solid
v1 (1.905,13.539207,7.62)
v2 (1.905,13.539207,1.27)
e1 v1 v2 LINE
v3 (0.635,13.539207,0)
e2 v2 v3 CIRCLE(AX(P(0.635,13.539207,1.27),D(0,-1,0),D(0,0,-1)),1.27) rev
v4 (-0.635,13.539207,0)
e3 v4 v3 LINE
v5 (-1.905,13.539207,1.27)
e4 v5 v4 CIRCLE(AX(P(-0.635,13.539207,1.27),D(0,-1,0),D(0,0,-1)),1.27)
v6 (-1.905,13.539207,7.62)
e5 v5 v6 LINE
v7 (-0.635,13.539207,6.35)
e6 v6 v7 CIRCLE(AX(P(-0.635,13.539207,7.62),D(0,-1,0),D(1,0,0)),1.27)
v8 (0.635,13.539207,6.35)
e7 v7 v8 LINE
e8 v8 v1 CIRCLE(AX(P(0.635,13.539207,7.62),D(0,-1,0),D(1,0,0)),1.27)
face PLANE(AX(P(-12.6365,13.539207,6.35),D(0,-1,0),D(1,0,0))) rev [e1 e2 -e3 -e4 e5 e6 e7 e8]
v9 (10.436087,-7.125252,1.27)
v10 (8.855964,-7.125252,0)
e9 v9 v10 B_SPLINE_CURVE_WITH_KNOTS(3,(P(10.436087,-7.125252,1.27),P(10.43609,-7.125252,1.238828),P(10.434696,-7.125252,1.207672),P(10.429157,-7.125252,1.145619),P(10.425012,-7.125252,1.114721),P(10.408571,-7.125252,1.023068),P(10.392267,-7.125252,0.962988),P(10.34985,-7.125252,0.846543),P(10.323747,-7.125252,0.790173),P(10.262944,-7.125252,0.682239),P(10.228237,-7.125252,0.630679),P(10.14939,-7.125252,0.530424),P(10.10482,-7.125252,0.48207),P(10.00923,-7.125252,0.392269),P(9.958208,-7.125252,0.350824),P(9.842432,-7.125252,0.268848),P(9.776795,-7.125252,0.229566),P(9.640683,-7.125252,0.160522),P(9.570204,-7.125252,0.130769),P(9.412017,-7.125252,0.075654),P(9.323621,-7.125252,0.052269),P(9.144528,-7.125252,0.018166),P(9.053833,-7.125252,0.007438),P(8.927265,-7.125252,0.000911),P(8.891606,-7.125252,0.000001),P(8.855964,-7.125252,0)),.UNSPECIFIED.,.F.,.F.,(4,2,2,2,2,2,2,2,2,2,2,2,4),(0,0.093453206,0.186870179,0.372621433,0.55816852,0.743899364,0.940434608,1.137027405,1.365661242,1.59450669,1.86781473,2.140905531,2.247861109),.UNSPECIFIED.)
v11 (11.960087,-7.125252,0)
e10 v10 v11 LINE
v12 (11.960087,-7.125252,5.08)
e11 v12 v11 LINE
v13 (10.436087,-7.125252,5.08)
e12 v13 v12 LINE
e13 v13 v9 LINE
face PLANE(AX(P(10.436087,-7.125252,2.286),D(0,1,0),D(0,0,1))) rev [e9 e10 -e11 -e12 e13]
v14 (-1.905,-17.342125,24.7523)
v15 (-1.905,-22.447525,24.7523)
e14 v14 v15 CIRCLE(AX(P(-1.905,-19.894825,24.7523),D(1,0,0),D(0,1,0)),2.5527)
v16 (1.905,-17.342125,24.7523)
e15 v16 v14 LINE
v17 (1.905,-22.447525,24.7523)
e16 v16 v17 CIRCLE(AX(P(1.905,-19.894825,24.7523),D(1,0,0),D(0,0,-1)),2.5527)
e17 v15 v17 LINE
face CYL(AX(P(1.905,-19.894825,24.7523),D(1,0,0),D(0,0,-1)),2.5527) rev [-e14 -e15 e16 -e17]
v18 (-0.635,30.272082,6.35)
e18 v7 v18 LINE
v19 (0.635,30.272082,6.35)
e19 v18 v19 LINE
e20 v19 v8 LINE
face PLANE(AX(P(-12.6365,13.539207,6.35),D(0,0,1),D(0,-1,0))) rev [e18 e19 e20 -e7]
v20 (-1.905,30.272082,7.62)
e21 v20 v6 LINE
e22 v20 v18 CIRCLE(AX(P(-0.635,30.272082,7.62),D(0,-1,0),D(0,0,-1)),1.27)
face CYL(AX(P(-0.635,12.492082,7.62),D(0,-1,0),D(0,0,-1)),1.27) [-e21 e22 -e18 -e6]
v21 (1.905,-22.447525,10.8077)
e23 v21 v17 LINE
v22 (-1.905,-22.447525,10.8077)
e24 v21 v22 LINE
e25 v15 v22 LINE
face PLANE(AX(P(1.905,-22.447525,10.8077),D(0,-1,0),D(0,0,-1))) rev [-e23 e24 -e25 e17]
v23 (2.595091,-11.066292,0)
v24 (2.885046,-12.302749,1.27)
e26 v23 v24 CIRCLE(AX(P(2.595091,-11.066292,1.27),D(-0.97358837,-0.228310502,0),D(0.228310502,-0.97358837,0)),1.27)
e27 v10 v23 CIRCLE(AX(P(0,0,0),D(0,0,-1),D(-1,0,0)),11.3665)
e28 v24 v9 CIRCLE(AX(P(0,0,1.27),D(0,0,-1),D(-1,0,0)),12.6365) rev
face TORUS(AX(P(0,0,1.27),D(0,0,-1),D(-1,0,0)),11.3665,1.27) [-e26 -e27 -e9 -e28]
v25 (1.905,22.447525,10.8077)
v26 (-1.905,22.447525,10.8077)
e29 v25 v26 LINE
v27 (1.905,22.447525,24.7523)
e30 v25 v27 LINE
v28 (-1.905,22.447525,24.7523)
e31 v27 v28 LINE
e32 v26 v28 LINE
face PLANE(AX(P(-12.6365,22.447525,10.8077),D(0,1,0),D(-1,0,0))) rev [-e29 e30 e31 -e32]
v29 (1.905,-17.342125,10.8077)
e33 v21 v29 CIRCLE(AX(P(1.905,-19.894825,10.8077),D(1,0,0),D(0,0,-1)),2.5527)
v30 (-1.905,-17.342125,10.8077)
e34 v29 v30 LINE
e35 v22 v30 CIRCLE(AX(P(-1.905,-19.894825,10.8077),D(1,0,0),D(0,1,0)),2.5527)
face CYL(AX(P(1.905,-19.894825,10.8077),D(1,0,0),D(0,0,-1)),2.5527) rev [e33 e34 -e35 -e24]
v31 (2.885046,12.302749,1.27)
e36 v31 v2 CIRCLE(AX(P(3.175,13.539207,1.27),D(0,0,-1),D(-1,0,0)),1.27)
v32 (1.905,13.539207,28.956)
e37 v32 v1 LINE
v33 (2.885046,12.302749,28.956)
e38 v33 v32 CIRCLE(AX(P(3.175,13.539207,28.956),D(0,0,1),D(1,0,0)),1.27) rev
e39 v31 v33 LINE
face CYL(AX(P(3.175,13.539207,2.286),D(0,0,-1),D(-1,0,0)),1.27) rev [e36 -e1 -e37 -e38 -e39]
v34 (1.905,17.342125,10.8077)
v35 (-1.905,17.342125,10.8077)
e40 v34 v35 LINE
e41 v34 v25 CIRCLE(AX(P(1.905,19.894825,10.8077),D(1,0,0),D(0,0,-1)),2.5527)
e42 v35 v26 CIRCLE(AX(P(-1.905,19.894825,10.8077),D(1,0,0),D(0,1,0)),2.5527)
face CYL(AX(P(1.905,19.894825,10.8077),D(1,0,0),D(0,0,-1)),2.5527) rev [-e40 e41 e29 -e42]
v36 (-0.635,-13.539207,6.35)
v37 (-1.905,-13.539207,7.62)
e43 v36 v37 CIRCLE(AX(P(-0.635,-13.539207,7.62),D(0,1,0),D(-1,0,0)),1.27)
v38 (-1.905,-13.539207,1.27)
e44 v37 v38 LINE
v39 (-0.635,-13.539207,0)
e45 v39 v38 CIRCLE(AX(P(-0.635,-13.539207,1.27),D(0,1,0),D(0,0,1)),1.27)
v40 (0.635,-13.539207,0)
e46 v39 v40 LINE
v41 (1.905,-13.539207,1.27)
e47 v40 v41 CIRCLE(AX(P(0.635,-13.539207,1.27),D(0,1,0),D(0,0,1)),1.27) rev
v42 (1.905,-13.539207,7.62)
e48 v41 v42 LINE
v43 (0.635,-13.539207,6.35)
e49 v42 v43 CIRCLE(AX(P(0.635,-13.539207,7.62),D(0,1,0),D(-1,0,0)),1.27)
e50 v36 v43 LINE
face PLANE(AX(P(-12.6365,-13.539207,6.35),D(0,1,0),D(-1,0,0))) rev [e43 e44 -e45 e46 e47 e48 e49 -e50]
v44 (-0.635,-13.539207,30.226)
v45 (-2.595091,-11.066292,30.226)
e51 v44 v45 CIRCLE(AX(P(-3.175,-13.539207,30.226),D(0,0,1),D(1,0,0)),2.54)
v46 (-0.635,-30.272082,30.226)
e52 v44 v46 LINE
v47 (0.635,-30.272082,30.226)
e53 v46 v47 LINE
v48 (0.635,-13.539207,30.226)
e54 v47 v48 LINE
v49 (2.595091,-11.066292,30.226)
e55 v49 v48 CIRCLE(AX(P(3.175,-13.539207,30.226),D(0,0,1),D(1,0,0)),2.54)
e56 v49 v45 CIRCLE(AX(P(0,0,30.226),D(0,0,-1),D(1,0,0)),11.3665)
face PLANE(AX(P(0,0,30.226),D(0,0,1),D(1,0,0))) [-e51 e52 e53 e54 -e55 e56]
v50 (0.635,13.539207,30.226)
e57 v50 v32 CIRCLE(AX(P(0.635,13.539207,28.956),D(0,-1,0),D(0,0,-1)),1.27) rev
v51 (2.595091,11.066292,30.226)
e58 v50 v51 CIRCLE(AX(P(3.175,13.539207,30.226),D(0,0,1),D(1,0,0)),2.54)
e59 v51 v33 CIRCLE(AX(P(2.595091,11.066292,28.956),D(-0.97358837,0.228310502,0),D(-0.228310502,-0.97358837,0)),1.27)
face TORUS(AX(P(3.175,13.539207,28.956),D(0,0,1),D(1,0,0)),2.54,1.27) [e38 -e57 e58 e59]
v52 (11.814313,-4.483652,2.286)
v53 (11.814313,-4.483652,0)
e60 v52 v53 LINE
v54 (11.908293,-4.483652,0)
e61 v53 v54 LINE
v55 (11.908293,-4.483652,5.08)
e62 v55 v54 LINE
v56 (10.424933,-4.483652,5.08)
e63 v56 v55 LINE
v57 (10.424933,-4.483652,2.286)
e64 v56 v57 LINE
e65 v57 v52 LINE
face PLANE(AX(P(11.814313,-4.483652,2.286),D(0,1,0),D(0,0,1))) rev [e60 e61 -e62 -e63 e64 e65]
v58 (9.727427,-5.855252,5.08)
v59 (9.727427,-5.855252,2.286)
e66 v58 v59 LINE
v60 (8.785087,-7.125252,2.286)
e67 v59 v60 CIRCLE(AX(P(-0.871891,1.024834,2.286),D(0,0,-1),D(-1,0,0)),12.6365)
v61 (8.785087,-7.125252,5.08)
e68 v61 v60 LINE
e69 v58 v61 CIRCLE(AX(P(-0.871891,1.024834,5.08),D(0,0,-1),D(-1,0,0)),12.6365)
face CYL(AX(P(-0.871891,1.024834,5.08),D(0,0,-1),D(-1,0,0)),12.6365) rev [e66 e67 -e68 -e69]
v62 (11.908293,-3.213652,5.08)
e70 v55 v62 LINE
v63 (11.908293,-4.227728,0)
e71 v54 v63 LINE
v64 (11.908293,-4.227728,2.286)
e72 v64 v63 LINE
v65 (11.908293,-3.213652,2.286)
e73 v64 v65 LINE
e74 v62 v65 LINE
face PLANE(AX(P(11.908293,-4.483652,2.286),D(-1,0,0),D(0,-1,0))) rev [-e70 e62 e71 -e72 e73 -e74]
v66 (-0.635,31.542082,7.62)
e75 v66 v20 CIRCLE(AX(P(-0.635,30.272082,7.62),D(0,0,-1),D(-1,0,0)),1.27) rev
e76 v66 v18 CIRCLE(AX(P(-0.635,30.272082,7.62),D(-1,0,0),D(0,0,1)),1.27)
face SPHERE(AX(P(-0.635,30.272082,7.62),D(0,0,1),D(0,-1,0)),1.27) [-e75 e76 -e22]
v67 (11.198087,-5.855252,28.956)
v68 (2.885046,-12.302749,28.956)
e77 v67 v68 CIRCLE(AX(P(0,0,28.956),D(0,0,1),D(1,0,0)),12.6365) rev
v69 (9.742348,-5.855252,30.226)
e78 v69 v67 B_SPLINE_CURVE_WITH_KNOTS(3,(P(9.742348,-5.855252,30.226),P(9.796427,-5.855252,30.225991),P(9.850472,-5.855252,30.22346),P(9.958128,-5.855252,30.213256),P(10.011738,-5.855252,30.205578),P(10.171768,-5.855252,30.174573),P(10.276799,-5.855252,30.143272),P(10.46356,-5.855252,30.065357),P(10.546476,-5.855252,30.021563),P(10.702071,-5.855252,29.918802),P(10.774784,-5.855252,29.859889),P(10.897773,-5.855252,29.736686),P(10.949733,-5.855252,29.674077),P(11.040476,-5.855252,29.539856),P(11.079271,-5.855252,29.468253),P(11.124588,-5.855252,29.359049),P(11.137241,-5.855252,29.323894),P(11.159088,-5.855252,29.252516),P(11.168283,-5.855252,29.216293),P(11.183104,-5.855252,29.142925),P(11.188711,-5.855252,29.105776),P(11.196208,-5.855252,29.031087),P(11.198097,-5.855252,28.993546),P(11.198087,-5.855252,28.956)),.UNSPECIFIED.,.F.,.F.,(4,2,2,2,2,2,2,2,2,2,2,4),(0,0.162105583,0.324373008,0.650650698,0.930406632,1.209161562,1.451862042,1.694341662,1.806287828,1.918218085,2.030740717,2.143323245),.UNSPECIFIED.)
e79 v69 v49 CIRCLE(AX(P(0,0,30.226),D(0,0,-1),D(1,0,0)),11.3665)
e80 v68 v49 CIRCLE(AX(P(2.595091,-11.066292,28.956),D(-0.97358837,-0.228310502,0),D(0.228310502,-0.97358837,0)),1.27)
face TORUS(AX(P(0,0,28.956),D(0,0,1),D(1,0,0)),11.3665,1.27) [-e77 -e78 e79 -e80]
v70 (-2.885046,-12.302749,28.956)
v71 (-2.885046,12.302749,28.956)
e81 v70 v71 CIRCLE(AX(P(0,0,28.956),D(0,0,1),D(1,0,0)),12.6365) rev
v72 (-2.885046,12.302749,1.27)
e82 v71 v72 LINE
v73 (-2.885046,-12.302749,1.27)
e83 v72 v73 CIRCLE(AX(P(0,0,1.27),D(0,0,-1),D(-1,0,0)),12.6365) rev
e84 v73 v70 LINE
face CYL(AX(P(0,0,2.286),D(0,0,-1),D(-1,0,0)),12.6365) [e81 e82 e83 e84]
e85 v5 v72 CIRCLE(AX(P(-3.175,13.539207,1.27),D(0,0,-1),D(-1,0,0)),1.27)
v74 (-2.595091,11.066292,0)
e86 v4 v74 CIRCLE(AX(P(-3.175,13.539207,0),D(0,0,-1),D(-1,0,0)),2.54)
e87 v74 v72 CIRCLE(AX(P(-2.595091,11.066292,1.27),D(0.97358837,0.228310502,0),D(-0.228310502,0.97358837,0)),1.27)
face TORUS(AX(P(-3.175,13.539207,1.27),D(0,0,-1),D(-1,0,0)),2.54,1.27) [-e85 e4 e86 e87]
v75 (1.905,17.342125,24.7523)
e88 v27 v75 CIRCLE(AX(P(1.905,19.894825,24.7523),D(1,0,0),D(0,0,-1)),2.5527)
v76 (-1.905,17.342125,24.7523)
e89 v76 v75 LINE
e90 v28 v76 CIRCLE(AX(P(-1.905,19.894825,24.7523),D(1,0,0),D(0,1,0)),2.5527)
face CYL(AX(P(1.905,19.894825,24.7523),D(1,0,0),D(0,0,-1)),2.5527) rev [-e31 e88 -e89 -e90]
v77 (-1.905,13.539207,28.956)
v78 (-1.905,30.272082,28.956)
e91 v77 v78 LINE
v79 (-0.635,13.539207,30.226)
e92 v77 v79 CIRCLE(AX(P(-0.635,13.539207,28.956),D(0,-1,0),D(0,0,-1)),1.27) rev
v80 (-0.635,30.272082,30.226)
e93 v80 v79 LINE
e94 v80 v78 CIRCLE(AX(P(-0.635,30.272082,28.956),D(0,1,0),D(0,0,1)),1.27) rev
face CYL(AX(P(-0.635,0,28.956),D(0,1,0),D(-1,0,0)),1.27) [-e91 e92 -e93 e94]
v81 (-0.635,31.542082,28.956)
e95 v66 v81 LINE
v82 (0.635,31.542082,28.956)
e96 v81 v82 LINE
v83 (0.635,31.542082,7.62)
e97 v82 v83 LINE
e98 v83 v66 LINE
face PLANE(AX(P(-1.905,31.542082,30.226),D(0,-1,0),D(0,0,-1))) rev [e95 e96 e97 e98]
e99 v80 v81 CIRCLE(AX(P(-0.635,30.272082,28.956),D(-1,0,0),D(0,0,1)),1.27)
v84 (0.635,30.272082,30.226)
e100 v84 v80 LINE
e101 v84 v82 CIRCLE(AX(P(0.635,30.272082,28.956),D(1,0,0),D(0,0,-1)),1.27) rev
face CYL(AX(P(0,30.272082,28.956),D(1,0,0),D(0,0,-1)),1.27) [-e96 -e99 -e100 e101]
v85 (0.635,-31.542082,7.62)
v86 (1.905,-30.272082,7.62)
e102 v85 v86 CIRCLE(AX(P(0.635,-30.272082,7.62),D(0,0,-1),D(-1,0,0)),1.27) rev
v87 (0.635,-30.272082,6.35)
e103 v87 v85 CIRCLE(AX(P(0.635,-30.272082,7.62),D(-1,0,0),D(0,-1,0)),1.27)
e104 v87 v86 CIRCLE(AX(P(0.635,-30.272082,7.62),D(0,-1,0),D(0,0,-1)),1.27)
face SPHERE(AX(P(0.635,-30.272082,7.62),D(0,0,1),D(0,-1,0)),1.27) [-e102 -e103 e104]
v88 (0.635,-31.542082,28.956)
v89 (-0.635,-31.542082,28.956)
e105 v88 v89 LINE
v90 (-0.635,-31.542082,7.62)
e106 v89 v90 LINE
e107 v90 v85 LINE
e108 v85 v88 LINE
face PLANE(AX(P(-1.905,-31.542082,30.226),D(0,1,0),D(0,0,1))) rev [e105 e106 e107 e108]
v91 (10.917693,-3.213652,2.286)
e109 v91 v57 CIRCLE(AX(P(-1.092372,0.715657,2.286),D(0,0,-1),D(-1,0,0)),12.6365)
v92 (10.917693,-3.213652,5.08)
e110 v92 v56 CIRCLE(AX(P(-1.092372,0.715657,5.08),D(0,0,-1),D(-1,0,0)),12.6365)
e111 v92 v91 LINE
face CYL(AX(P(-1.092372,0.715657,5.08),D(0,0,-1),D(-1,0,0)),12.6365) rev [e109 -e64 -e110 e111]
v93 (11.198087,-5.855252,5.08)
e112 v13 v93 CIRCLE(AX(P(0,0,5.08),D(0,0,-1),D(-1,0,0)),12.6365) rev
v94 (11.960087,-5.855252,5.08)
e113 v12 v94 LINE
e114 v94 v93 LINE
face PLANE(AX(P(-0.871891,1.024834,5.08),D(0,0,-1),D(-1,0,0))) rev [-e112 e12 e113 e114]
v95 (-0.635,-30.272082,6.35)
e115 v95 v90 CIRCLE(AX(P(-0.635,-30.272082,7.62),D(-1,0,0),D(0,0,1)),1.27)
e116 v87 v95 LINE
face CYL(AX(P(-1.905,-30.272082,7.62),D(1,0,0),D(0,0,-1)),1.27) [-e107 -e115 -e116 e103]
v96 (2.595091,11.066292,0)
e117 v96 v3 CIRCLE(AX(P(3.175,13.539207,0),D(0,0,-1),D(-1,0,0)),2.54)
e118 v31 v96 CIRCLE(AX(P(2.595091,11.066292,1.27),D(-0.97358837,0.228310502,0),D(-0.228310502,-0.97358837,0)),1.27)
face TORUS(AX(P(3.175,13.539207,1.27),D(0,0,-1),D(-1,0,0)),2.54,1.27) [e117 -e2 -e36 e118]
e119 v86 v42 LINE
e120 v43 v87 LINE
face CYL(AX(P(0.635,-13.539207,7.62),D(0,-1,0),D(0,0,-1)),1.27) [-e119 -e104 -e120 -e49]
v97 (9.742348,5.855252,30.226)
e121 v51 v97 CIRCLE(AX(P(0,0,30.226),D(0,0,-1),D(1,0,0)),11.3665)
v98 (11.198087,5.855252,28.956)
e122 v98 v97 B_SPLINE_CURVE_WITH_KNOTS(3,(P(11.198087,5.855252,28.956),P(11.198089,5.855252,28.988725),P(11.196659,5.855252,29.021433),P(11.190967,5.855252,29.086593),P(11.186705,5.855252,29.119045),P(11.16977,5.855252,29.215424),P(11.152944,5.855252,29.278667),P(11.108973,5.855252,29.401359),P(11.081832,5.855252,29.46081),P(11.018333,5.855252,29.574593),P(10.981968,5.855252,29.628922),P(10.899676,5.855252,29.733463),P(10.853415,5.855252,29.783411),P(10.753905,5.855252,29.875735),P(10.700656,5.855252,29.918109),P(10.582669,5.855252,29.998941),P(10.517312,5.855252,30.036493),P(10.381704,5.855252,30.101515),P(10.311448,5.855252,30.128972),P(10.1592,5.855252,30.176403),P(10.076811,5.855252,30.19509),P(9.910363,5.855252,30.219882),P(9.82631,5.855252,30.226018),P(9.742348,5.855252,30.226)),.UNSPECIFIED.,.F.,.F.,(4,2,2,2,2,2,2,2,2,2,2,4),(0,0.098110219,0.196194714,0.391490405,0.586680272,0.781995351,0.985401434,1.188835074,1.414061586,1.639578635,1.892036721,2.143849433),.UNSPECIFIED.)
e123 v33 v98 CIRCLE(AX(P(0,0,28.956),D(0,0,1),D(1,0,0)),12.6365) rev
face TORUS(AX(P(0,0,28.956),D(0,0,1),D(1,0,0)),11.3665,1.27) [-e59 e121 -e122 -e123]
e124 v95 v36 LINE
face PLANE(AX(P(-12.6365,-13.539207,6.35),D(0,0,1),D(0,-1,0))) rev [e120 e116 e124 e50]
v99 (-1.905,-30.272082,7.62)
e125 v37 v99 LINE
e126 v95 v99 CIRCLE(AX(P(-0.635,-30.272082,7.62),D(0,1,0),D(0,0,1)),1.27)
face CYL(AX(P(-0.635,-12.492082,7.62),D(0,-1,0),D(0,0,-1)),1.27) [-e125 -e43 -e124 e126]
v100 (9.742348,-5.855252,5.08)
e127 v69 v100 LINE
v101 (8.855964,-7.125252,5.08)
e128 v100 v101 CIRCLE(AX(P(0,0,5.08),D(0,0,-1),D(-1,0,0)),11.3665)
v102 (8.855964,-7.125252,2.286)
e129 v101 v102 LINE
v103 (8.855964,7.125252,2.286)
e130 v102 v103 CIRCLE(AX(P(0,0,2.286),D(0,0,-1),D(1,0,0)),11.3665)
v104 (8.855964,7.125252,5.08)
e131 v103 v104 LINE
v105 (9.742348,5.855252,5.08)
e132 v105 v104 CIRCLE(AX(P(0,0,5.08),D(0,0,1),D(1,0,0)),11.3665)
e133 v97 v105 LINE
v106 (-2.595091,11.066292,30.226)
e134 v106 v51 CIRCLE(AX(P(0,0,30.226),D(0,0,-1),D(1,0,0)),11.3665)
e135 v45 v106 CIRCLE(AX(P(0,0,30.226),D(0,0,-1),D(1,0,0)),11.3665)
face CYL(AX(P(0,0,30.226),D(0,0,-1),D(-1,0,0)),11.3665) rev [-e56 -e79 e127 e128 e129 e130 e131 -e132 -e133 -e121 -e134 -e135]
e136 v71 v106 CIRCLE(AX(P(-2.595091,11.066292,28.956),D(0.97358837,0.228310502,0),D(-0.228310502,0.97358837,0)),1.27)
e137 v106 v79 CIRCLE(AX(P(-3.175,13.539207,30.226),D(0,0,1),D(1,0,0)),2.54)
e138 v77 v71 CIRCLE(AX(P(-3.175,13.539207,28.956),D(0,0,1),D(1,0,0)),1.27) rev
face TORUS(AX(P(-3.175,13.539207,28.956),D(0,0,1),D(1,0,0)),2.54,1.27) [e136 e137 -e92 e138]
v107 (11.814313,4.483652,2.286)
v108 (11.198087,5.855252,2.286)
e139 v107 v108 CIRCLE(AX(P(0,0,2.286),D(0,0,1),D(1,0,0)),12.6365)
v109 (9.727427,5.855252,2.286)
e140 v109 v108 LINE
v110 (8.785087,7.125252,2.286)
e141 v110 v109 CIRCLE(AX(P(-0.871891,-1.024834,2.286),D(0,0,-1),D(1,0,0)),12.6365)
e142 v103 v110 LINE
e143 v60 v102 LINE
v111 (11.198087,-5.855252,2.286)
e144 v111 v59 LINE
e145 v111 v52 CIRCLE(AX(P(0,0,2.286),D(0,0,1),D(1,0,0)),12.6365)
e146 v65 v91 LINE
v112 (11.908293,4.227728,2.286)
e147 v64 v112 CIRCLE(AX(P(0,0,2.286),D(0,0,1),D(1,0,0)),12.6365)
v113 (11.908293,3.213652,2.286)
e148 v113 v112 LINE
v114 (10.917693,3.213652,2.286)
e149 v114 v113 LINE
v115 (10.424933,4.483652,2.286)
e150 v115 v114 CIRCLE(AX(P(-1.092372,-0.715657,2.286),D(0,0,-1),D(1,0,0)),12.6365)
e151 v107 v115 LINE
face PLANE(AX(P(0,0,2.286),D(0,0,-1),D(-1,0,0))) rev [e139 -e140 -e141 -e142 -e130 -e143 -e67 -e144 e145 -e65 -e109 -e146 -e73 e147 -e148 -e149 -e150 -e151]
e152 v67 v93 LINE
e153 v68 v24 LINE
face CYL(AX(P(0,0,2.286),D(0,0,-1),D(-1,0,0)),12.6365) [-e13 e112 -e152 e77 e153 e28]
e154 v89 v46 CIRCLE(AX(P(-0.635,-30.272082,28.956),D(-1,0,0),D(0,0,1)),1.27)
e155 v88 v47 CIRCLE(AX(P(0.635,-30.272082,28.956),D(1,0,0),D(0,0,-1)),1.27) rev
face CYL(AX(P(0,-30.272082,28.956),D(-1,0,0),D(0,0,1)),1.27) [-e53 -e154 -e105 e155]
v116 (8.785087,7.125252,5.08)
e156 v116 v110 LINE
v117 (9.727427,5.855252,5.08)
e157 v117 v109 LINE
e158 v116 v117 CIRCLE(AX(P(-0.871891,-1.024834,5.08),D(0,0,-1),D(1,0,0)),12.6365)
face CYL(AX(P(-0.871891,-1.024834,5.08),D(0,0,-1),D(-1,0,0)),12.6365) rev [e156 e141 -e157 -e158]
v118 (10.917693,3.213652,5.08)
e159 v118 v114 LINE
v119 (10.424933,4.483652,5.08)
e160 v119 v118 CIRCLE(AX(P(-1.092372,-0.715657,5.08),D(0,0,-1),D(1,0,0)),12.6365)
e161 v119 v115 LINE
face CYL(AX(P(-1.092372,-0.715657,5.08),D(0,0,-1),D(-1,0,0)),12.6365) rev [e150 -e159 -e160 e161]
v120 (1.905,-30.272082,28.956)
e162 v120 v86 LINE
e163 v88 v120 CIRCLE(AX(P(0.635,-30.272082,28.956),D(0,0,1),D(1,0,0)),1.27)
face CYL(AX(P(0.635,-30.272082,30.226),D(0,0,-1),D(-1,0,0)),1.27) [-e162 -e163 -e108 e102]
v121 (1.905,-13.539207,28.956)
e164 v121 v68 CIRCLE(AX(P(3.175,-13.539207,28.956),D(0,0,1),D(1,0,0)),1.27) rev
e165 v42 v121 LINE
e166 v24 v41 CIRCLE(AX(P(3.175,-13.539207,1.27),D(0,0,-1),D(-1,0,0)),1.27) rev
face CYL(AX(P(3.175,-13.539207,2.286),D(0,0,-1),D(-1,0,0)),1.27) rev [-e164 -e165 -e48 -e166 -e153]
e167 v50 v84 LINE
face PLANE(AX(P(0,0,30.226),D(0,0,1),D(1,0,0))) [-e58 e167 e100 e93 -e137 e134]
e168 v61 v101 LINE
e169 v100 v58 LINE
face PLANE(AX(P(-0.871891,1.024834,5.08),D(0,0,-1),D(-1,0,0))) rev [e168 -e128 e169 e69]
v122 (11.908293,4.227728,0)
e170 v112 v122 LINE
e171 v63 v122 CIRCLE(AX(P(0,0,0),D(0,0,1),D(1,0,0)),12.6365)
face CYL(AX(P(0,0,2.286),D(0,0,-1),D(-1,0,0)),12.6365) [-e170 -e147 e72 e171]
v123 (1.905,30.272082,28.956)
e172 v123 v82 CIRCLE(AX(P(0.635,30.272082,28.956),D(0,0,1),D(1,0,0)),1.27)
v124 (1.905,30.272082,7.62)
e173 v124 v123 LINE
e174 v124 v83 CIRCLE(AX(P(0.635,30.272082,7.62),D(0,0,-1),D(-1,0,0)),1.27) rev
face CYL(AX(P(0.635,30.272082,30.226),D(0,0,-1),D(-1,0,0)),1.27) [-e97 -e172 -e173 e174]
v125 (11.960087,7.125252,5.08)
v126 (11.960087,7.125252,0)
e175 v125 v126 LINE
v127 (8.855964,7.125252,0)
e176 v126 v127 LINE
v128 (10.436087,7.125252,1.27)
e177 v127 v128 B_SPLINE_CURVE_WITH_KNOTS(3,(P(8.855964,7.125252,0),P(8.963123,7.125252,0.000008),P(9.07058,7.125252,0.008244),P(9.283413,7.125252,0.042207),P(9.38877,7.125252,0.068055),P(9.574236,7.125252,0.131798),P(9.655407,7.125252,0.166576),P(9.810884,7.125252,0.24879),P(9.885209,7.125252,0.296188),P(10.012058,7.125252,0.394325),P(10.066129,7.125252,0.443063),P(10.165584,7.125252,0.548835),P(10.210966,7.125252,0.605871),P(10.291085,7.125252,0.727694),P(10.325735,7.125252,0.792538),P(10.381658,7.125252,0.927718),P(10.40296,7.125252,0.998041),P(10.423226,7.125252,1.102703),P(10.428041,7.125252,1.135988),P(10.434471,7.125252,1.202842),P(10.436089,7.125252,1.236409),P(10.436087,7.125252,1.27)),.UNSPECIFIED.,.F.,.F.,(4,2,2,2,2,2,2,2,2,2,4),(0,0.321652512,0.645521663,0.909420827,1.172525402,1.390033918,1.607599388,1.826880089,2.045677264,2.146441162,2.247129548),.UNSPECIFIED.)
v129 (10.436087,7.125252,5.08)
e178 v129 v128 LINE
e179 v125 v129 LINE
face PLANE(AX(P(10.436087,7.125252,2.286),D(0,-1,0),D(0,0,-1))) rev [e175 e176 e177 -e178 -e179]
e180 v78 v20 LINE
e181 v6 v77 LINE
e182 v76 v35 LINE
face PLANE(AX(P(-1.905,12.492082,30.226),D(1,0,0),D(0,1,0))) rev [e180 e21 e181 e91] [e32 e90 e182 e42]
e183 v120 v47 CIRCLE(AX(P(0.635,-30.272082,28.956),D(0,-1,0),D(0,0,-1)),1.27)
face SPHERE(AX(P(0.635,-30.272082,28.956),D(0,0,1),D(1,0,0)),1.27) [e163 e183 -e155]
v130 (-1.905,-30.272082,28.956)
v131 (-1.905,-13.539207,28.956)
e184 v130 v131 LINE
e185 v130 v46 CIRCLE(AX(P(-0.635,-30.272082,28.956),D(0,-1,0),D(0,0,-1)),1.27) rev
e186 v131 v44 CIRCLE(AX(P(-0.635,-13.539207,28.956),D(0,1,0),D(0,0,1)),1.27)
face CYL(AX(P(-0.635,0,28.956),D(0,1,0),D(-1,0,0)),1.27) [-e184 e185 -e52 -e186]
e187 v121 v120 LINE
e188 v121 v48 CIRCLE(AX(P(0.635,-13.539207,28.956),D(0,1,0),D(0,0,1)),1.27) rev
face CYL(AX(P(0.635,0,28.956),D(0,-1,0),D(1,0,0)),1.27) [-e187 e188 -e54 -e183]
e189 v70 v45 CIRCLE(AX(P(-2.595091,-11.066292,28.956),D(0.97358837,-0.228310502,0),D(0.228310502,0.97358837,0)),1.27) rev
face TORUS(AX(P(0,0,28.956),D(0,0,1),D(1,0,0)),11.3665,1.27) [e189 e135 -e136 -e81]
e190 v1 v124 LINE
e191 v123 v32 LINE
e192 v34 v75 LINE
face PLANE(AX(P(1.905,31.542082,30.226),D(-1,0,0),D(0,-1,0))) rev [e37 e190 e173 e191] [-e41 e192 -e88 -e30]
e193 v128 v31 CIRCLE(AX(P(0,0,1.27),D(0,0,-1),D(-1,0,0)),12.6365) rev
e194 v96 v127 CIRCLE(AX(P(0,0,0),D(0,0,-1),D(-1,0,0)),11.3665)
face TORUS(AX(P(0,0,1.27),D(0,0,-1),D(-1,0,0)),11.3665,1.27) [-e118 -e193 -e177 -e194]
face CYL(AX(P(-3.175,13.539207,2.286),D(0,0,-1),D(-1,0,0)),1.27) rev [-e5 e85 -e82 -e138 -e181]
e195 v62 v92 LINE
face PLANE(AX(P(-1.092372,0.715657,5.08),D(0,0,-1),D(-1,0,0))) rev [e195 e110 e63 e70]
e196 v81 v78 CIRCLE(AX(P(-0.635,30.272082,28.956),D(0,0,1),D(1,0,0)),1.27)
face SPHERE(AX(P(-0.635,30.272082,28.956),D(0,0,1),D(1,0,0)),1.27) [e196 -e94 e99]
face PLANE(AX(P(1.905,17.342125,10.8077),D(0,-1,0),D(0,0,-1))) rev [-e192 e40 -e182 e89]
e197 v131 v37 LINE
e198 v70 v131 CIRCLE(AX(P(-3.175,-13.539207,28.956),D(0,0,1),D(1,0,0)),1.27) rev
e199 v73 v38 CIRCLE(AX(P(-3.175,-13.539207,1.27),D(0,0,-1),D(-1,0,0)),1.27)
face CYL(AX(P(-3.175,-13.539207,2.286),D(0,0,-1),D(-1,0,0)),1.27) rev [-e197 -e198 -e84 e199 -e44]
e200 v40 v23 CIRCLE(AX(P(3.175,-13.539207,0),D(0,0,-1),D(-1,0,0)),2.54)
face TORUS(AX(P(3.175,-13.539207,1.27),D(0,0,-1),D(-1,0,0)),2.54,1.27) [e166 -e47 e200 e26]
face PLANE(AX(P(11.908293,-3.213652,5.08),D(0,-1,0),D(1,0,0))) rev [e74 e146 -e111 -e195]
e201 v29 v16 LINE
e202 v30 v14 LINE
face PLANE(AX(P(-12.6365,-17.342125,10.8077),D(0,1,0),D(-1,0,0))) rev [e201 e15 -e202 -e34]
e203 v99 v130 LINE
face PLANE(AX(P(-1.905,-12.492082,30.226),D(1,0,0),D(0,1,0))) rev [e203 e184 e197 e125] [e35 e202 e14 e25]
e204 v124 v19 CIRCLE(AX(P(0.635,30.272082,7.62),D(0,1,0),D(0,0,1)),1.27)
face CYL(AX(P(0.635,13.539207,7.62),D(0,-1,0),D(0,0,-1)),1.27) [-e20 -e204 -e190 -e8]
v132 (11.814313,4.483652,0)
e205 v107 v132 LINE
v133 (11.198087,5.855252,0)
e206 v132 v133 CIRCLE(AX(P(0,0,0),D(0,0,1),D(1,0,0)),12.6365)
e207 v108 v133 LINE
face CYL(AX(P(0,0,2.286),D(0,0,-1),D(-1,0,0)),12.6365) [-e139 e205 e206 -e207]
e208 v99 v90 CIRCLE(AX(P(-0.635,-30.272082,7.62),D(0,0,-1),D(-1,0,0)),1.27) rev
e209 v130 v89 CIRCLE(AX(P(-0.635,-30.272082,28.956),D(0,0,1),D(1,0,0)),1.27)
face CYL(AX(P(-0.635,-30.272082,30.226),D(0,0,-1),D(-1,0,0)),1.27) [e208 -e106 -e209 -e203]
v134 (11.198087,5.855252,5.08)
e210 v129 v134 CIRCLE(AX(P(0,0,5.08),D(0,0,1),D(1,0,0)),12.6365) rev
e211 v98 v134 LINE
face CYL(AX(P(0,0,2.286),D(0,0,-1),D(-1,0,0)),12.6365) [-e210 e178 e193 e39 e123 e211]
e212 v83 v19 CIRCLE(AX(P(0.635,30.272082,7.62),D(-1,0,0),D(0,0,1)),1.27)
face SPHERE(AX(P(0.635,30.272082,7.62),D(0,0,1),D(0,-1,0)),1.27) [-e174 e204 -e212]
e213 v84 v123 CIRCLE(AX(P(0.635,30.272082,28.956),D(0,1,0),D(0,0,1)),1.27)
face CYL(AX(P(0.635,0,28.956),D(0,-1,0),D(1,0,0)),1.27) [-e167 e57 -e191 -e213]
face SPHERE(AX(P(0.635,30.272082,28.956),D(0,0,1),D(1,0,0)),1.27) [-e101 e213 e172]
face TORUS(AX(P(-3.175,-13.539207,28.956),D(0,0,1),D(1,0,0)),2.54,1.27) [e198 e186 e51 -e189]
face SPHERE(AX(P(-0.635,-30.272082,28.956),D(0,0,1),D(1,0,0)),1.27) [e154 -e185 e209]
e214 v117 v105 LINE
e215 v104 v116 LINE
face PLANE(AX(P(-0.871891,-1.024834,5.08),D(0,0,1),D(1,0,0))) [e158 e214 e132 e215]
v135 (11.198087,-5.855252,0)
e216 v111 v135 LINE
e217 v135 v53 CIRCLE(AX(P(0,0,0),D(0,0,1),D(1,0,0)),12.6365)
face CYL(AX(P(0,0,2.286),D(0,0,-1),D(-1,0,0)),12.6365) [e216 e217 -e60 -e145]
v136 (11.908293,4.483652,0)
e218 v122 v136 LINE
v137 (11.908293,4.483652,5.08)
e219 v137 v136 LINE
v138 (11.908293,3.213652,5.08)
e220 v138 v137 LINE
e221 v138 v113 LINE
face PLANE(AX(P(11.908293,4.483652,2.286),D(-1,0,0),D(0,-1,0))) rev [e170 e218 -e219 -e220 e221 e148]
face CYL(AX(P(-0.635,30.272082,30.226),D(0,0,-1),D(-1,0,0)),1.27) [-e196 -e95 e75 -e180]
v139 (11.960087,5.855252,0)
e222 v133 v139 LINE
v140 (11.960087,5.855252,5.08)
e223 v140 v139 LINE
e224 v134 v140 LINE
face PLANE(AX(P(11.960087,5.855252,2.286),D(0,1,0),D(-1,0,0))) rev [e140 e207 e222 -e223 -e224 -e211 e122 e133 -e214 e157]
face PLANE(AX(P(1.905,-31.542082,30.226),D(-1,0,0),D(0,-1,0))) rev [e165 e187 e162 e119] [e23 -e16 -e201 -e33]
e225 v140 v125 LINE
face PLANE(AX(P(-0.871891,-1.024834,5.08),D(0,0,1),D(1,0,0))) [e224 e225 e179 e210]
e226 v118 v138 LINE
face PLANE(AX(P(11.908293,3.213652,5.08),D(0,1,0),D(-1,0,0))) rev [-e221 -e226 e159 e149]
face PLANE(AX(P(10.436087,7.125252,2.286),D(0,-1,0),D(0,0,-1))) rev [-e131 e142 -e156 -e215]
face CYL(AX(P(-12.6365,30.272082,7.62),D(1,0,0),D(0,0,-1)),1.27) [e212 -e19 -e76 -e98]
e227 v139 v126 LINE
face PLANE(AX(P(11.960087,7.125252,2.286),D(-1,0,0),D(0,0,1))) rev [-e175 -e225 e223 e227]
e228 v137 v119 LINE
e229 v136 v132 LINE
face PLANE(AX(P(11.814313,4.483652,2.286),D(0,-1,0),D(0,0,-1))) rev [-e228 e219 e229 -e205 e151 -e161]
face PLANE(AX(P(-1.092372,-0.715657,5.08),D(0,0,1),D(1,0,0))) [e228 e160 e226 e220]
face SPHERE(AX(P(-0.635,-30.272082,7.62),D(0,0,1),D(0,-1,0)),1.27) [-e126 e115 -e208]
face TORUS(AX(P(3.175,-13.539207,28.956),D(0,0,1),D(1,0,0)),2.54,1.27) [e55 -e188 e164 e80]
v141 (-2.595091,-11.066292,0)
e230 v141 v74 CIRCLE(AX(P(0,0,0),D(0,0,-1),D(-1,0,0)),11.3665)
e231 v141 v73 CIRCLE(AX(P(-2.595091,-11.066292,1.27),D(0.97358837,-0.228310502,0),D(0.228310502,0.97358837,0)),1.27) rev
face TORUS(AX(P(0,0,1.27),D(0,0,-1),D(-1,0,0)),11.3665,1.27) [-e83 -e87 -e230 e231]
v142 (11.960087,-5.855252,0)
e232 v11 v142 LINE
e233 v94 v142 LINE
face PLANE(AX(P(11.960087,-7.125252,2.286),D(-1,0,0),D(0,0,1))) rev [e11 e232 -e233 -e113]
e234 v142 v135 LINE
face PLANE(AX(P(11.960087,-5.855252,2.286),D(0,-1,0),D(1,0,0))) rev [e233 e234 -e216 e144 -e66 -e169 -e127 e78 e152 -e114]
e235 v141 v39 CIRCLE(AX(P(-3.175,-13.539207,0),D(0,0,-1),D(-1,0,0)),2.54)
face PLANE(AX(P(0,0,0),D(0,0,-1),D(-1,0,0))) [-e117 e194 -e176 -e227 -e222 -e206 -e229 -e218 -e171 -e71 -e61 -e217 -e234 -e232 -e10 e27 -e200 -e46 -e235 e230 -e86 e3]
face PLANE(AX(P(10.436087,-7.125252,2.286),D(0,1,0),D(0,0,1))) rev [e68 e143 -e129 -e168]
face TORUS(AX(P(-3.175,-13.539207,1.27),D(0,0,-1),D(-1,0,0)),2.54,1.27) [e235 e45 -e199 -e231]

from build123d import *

# Parameters (mm, degrees)
BOSS_EXTRUDE1_DEPTH        = 2.286
BOSS_EXTRUDE2_DEPTH        = 2.794
BOSS_EXTRUDE3_DEPTH        = 27.94
BOSS_EXTRUDE4_DEPTH        = 15.113
FILLET1_R                  = 1.27
F_10_START                 = -1.905
F_10_CLEARANCE_SLOT1_DEPTH = 3.81
SKETCH9_W                  = 6.35
SKETCH9_H                  = 18.002875112
CUT_EXTRUDE1_DEPTH         = 47.043123595
FILLET2_R                  = 1.27


# Read off the part's stored shape, not the designer's step: #10 Clearance Slot1
with BuildPart() as part:
    # Sketch1 → Boss-Extrude1 (new body)
    with BuildSketch(Plane.XY):
        with BuildLine():
            Line((10.43608705, 7.12525223), (11.96008705, 7.12525223))
            Line((11.96008705, 7.12525223), (11.96008705, 5.85525223))
            Line((11.96008705, 5.85525223), (11.19808705, 5.85525223))
            ThreePointArc((11.19808705, 5.85525223), (11.526619723, 5.178626266), (11.814313138, 4.48365223))
            Line((11.814313138, 4.48365223), (11.908293138, 4.48365223))
            Line((11.908293138, 4.48365223), (11.908293138, 4.227728324))
            ThreePointArc((11.908293138, 4.227728324), (12.6365, 0), (11.908293138, -4.227728324))
            Line((11.908293138, -4.227728324), (11.908293138, -4.48365223))
            Line((11.908293138, -4.48365223), (11.814313138, -4.48365223))
            ThreePointArc((11.814313138, -4.48365223), (11.526619723, -5.178626266), (11.19808705, -5.85525223))
            Line((11.19808705, -5.85525223), (11.96008705, -5.85525223))
            Line((11.96008705, -5.85525223), (11.96008705, -7.12525223))
            Line((11.96008705, -7.12525223), (10.43608705, -7.12525223))
            ThreePointArc((10.43608705, -7.12525223), (8.963495738, -8.907125036), (7.190948519, -10.390928334))
            ThreePointArc((7.190948519, -10.390928334), (0.124386606, -12.635887789), (-6.985, -10.530475167))
            ThreePointArc((-6.985, -10.530475167), (-12.628106428, 0.460500059), (-6.199452951, 11.011263114))
            ThreePointArc((-6.199452951, 11.011263114), (0.920388359, 12.602936861), (7.733442071, 9.993748345))
            ThreePointArc((7.733442071, 9.993748345), (9.197283002, 8.66551312), (10.43608705, 7.12525223))
        make_face()
    extrude(amount=BOSS_EXTRUDE1_DEPTH)

    # Sketch2 → Boss-Extrude2 (add)
    with BuildSketch(Plane.XY.offset(2.286)):
        with BuildLine():
            Line((8.78508705, 7.12525223), (11.96008705, 7.12525223))
            Line((11.96008705, 7.12525223), (11.96008705, 5.85525223))
            Line((11.96008705, 5.85525223), (9.72742705, 5.85525223))
            ThreePointArc((9.72742705, 5.85525223), (9.276143682, 6.505008111), (8.78508705, 7.12525223))
        make_face()
        with BuildLine():
            Line((10.424933138, 4.48365223), (11.908293138, 4.48365223))
            Line((11.908293138, 4.48365223), (11.908293138, 3.21365223))
            Line((11.908293138, 3.21365223), (10.917693138, 3.21365223))
            ThreePointArc((10.917693138, 3.21365223), (10.688439222, 3.85529715), (10.424933138, 4.48365223))
        make_face()
        with BuildLine():
            Line((11.908293138, -3.21365223), (10.917693138, -3.21365223))
            ThreePointArc((10.917693138, -3.21365223), (10.688439222, -3.85529715), (10.424933138, -4.48365223))
            Line((10.424933138, -4.48365223), (11.908293138, -4.48365223))
            Line((11.908293138, -4.48365223), (11.908293138, -3.21365223))
        make_face()
        with BuildLine():
            Line((11.96008705, -5.85525223), (9.72742705, -5.85525223))
            ThreePointArc((9.72742705, -5.85525223), (9.276143682, -6.505008111), (8.78508705, -7.12525223))
            Line((8.78508705, -7.12525223), (11.96008705, -7.12525223))
            Line((11.96008705, -7.12525223), (11.96008705, -5.85525223))
        make_face()
    extrude(amount=BOSS_EXTRUDE2_DEPTH)

    # Sketch3 → Boss-Extrude3 (add)
    with BuildSketch(Plane.XY.offset(2.286)):
        with BuildLine():
            Line((11.19808705, 5.85525223), (9.74234795, 5.85525223))
            ThreePointArc((9.74234795, 5.85525223), (-11.3665, 0), (9.74234795, -5.85525223))
            Line((9.74234795, -5.85525223), (11.19808705, -5.85525223))
            ThreePointArc((11.19808705, -5.85525223), (-12.6365, 0), (11.19808705, 5.85525223))
        make_face()
    extrude(amount=BOSS_EXTRUDE3_DEPTH)

    # Sketch4 → Boss-Extrude4 (add, symmetric)
    with BuildSketch(Plane.XY.offset(15.113)):
        with BuildLine():
            Line((-1.905, -12.492081782), (-1.905, -31.542081782))
            Line((-1.905, -31.542081782), (1.905, -31.542081782))
            Line((1.905, -31.542081782), (1.905, -12.492081782))
            ThreePointArc((1.905, -12.492081782), (0, -12.6365), (-1.905, -12.492081782))
        make_face()
        with BuildLine():
            Line((1.905, 31.542081782), (1.905, 12.492081782))
            ThreePointArc((1.905, 12.492081782), (0, 12.6365), (-1.905, 12.492081782))
            Line((-1.905, 12.492081782), (-1.905, 31.542081782))
            Line((-1.905, 31.542081782), (1.905, 31.542081782))
        make_face()
    extrude(amount=BOSS_EXTRUDE4_DEPTH, both=True)

    # Fillet1
    fillet1_edges = [part.edges().sort_by_distance(p)[0] for p in [
        (7.344017918, 10.283313331, 30.226),
        (-12.6365, 0, 30.226),
        (-12.6365, 0, 0),
        (6.728768257, 10.696018418, 0),
        (1.905, -22.017081782, 0),
        (1.905, -22.017081782, 30.226),
        (-1.905, -22.017081782, 0),
        (-1.905, -22.017081782, 30.226),
        (-1.905, -31.542081782, 15.113),
        (0, -31.542081782, 30.226),
        (1.905, -31.542081782, 15.113),
        (-1.905, -12.492081782, 15.113),
        (1.905, -12.492081782, 15.113),
        (-1.905, 22.017081782, 0),
        (-1.905, 22.017081782, 30.226),
        (1.905, 12.492081782, 15.113),
        (1.905, 31.542081782, 15.113),
        (0, 31.542081782, 0),
        (0, 31.542081782, 30.226),
        (-1.905, 31.542081782, 15.113),
        (-1.905, 12.492081782, 15.113),
        (6.728768257, -10.696018418, 0),
        (7.344017918, -10.283313331, 30.226),
        (1.905, 22.017081782, 0),
        (1.905, 22.017081782, 30.226),
    ]]
    fillet(fillet1_edges, radius=FILLET1_R - 0.0001)  # a hair under: the kernel refuses the full size

    # #10 Clearance Slot1 outline → #10 Clearance Slot1 (cut)
    with BuildSketch(Plane.YZ.offset(F_10_START)):
        with BuildLine():
            ThreePointArc((-22.447524785, 10.8077), (-19.894824785, 8.255), (-17.342124785, 10.8077))
            Line((-17.342124785, 10.8077), (-17.342124785, 24.7523))
            ThreePointArc((-17.342124785, 24.7523), (-19.894824785, 27.305), (-22.447524785, 24.7523))
            Line((-22.447524785, 24.7523), (-22.447524785, 10.8077))
        make_face()
        with BuildLine():
            Line((17.342124785, 24.7523), (17.342124785, 10.8077))
            ThreePointArc((17.342124785, 10.8077), (19.894824785, 8.255), (22.447524785, 10.8077))
            Line((22.447524785, 10.8077), (22.447524785, 24.7523))
            ThreePointArc((22.447524785, 24.7523), (19.894824785, 27.305), (17.342124785, 24.7523))
        make_face()
    extrude(amount=F_10_CLEARANCE_SLOT1_DEPTH, mode=Mode.SUBTRACT)

    # Sketch9 → Cut-Extrude1 (cut, through all)
    with BuildSketch(Plane(origin=(1.905, 0, 0), x_dir=(0, 0, -1), z_dir=(1, 0, 0))):
        with Locations((-3.175, -22.540644226)):
            Rectangle(SKETCH9_W, SKETCH9_H)
        with Locations((-3.175, 22.540644226)):
            Rectangle(SKETCH9_W, SKETCH9_H)
    extrude(amount=-CUT_EXTRUDE1_DEPTH, mode=Mode.SUBTRACT)

    # Fillet2
    fillet2_edges = [part.edges().sort_by_distance(p)[0] for p in [
        (1.905, -21.905694226, 6.35),
        (1.533054901, -31.170136684, 6.35),
        (-1.905, -21.905694226, 6.35),
        (0, -31.542081782, 6.35),
        (-1.533054901, -31.170136684, 6.35),
        (1.533054901, 31.170136684, 6.35),
        (-1.905, 21.905694226, 6.35),
        (-1.533054901, 31.170136684, 6.35),
        (0, 31.542081782, 6.35),
        (1.905, 21.905694226, 6.35),
    ]]
    fillet(fillet2_edges, radius=FILLET2_R - 0.0001)  # a hair under: the kernel refuses the full size


solid = part.part
